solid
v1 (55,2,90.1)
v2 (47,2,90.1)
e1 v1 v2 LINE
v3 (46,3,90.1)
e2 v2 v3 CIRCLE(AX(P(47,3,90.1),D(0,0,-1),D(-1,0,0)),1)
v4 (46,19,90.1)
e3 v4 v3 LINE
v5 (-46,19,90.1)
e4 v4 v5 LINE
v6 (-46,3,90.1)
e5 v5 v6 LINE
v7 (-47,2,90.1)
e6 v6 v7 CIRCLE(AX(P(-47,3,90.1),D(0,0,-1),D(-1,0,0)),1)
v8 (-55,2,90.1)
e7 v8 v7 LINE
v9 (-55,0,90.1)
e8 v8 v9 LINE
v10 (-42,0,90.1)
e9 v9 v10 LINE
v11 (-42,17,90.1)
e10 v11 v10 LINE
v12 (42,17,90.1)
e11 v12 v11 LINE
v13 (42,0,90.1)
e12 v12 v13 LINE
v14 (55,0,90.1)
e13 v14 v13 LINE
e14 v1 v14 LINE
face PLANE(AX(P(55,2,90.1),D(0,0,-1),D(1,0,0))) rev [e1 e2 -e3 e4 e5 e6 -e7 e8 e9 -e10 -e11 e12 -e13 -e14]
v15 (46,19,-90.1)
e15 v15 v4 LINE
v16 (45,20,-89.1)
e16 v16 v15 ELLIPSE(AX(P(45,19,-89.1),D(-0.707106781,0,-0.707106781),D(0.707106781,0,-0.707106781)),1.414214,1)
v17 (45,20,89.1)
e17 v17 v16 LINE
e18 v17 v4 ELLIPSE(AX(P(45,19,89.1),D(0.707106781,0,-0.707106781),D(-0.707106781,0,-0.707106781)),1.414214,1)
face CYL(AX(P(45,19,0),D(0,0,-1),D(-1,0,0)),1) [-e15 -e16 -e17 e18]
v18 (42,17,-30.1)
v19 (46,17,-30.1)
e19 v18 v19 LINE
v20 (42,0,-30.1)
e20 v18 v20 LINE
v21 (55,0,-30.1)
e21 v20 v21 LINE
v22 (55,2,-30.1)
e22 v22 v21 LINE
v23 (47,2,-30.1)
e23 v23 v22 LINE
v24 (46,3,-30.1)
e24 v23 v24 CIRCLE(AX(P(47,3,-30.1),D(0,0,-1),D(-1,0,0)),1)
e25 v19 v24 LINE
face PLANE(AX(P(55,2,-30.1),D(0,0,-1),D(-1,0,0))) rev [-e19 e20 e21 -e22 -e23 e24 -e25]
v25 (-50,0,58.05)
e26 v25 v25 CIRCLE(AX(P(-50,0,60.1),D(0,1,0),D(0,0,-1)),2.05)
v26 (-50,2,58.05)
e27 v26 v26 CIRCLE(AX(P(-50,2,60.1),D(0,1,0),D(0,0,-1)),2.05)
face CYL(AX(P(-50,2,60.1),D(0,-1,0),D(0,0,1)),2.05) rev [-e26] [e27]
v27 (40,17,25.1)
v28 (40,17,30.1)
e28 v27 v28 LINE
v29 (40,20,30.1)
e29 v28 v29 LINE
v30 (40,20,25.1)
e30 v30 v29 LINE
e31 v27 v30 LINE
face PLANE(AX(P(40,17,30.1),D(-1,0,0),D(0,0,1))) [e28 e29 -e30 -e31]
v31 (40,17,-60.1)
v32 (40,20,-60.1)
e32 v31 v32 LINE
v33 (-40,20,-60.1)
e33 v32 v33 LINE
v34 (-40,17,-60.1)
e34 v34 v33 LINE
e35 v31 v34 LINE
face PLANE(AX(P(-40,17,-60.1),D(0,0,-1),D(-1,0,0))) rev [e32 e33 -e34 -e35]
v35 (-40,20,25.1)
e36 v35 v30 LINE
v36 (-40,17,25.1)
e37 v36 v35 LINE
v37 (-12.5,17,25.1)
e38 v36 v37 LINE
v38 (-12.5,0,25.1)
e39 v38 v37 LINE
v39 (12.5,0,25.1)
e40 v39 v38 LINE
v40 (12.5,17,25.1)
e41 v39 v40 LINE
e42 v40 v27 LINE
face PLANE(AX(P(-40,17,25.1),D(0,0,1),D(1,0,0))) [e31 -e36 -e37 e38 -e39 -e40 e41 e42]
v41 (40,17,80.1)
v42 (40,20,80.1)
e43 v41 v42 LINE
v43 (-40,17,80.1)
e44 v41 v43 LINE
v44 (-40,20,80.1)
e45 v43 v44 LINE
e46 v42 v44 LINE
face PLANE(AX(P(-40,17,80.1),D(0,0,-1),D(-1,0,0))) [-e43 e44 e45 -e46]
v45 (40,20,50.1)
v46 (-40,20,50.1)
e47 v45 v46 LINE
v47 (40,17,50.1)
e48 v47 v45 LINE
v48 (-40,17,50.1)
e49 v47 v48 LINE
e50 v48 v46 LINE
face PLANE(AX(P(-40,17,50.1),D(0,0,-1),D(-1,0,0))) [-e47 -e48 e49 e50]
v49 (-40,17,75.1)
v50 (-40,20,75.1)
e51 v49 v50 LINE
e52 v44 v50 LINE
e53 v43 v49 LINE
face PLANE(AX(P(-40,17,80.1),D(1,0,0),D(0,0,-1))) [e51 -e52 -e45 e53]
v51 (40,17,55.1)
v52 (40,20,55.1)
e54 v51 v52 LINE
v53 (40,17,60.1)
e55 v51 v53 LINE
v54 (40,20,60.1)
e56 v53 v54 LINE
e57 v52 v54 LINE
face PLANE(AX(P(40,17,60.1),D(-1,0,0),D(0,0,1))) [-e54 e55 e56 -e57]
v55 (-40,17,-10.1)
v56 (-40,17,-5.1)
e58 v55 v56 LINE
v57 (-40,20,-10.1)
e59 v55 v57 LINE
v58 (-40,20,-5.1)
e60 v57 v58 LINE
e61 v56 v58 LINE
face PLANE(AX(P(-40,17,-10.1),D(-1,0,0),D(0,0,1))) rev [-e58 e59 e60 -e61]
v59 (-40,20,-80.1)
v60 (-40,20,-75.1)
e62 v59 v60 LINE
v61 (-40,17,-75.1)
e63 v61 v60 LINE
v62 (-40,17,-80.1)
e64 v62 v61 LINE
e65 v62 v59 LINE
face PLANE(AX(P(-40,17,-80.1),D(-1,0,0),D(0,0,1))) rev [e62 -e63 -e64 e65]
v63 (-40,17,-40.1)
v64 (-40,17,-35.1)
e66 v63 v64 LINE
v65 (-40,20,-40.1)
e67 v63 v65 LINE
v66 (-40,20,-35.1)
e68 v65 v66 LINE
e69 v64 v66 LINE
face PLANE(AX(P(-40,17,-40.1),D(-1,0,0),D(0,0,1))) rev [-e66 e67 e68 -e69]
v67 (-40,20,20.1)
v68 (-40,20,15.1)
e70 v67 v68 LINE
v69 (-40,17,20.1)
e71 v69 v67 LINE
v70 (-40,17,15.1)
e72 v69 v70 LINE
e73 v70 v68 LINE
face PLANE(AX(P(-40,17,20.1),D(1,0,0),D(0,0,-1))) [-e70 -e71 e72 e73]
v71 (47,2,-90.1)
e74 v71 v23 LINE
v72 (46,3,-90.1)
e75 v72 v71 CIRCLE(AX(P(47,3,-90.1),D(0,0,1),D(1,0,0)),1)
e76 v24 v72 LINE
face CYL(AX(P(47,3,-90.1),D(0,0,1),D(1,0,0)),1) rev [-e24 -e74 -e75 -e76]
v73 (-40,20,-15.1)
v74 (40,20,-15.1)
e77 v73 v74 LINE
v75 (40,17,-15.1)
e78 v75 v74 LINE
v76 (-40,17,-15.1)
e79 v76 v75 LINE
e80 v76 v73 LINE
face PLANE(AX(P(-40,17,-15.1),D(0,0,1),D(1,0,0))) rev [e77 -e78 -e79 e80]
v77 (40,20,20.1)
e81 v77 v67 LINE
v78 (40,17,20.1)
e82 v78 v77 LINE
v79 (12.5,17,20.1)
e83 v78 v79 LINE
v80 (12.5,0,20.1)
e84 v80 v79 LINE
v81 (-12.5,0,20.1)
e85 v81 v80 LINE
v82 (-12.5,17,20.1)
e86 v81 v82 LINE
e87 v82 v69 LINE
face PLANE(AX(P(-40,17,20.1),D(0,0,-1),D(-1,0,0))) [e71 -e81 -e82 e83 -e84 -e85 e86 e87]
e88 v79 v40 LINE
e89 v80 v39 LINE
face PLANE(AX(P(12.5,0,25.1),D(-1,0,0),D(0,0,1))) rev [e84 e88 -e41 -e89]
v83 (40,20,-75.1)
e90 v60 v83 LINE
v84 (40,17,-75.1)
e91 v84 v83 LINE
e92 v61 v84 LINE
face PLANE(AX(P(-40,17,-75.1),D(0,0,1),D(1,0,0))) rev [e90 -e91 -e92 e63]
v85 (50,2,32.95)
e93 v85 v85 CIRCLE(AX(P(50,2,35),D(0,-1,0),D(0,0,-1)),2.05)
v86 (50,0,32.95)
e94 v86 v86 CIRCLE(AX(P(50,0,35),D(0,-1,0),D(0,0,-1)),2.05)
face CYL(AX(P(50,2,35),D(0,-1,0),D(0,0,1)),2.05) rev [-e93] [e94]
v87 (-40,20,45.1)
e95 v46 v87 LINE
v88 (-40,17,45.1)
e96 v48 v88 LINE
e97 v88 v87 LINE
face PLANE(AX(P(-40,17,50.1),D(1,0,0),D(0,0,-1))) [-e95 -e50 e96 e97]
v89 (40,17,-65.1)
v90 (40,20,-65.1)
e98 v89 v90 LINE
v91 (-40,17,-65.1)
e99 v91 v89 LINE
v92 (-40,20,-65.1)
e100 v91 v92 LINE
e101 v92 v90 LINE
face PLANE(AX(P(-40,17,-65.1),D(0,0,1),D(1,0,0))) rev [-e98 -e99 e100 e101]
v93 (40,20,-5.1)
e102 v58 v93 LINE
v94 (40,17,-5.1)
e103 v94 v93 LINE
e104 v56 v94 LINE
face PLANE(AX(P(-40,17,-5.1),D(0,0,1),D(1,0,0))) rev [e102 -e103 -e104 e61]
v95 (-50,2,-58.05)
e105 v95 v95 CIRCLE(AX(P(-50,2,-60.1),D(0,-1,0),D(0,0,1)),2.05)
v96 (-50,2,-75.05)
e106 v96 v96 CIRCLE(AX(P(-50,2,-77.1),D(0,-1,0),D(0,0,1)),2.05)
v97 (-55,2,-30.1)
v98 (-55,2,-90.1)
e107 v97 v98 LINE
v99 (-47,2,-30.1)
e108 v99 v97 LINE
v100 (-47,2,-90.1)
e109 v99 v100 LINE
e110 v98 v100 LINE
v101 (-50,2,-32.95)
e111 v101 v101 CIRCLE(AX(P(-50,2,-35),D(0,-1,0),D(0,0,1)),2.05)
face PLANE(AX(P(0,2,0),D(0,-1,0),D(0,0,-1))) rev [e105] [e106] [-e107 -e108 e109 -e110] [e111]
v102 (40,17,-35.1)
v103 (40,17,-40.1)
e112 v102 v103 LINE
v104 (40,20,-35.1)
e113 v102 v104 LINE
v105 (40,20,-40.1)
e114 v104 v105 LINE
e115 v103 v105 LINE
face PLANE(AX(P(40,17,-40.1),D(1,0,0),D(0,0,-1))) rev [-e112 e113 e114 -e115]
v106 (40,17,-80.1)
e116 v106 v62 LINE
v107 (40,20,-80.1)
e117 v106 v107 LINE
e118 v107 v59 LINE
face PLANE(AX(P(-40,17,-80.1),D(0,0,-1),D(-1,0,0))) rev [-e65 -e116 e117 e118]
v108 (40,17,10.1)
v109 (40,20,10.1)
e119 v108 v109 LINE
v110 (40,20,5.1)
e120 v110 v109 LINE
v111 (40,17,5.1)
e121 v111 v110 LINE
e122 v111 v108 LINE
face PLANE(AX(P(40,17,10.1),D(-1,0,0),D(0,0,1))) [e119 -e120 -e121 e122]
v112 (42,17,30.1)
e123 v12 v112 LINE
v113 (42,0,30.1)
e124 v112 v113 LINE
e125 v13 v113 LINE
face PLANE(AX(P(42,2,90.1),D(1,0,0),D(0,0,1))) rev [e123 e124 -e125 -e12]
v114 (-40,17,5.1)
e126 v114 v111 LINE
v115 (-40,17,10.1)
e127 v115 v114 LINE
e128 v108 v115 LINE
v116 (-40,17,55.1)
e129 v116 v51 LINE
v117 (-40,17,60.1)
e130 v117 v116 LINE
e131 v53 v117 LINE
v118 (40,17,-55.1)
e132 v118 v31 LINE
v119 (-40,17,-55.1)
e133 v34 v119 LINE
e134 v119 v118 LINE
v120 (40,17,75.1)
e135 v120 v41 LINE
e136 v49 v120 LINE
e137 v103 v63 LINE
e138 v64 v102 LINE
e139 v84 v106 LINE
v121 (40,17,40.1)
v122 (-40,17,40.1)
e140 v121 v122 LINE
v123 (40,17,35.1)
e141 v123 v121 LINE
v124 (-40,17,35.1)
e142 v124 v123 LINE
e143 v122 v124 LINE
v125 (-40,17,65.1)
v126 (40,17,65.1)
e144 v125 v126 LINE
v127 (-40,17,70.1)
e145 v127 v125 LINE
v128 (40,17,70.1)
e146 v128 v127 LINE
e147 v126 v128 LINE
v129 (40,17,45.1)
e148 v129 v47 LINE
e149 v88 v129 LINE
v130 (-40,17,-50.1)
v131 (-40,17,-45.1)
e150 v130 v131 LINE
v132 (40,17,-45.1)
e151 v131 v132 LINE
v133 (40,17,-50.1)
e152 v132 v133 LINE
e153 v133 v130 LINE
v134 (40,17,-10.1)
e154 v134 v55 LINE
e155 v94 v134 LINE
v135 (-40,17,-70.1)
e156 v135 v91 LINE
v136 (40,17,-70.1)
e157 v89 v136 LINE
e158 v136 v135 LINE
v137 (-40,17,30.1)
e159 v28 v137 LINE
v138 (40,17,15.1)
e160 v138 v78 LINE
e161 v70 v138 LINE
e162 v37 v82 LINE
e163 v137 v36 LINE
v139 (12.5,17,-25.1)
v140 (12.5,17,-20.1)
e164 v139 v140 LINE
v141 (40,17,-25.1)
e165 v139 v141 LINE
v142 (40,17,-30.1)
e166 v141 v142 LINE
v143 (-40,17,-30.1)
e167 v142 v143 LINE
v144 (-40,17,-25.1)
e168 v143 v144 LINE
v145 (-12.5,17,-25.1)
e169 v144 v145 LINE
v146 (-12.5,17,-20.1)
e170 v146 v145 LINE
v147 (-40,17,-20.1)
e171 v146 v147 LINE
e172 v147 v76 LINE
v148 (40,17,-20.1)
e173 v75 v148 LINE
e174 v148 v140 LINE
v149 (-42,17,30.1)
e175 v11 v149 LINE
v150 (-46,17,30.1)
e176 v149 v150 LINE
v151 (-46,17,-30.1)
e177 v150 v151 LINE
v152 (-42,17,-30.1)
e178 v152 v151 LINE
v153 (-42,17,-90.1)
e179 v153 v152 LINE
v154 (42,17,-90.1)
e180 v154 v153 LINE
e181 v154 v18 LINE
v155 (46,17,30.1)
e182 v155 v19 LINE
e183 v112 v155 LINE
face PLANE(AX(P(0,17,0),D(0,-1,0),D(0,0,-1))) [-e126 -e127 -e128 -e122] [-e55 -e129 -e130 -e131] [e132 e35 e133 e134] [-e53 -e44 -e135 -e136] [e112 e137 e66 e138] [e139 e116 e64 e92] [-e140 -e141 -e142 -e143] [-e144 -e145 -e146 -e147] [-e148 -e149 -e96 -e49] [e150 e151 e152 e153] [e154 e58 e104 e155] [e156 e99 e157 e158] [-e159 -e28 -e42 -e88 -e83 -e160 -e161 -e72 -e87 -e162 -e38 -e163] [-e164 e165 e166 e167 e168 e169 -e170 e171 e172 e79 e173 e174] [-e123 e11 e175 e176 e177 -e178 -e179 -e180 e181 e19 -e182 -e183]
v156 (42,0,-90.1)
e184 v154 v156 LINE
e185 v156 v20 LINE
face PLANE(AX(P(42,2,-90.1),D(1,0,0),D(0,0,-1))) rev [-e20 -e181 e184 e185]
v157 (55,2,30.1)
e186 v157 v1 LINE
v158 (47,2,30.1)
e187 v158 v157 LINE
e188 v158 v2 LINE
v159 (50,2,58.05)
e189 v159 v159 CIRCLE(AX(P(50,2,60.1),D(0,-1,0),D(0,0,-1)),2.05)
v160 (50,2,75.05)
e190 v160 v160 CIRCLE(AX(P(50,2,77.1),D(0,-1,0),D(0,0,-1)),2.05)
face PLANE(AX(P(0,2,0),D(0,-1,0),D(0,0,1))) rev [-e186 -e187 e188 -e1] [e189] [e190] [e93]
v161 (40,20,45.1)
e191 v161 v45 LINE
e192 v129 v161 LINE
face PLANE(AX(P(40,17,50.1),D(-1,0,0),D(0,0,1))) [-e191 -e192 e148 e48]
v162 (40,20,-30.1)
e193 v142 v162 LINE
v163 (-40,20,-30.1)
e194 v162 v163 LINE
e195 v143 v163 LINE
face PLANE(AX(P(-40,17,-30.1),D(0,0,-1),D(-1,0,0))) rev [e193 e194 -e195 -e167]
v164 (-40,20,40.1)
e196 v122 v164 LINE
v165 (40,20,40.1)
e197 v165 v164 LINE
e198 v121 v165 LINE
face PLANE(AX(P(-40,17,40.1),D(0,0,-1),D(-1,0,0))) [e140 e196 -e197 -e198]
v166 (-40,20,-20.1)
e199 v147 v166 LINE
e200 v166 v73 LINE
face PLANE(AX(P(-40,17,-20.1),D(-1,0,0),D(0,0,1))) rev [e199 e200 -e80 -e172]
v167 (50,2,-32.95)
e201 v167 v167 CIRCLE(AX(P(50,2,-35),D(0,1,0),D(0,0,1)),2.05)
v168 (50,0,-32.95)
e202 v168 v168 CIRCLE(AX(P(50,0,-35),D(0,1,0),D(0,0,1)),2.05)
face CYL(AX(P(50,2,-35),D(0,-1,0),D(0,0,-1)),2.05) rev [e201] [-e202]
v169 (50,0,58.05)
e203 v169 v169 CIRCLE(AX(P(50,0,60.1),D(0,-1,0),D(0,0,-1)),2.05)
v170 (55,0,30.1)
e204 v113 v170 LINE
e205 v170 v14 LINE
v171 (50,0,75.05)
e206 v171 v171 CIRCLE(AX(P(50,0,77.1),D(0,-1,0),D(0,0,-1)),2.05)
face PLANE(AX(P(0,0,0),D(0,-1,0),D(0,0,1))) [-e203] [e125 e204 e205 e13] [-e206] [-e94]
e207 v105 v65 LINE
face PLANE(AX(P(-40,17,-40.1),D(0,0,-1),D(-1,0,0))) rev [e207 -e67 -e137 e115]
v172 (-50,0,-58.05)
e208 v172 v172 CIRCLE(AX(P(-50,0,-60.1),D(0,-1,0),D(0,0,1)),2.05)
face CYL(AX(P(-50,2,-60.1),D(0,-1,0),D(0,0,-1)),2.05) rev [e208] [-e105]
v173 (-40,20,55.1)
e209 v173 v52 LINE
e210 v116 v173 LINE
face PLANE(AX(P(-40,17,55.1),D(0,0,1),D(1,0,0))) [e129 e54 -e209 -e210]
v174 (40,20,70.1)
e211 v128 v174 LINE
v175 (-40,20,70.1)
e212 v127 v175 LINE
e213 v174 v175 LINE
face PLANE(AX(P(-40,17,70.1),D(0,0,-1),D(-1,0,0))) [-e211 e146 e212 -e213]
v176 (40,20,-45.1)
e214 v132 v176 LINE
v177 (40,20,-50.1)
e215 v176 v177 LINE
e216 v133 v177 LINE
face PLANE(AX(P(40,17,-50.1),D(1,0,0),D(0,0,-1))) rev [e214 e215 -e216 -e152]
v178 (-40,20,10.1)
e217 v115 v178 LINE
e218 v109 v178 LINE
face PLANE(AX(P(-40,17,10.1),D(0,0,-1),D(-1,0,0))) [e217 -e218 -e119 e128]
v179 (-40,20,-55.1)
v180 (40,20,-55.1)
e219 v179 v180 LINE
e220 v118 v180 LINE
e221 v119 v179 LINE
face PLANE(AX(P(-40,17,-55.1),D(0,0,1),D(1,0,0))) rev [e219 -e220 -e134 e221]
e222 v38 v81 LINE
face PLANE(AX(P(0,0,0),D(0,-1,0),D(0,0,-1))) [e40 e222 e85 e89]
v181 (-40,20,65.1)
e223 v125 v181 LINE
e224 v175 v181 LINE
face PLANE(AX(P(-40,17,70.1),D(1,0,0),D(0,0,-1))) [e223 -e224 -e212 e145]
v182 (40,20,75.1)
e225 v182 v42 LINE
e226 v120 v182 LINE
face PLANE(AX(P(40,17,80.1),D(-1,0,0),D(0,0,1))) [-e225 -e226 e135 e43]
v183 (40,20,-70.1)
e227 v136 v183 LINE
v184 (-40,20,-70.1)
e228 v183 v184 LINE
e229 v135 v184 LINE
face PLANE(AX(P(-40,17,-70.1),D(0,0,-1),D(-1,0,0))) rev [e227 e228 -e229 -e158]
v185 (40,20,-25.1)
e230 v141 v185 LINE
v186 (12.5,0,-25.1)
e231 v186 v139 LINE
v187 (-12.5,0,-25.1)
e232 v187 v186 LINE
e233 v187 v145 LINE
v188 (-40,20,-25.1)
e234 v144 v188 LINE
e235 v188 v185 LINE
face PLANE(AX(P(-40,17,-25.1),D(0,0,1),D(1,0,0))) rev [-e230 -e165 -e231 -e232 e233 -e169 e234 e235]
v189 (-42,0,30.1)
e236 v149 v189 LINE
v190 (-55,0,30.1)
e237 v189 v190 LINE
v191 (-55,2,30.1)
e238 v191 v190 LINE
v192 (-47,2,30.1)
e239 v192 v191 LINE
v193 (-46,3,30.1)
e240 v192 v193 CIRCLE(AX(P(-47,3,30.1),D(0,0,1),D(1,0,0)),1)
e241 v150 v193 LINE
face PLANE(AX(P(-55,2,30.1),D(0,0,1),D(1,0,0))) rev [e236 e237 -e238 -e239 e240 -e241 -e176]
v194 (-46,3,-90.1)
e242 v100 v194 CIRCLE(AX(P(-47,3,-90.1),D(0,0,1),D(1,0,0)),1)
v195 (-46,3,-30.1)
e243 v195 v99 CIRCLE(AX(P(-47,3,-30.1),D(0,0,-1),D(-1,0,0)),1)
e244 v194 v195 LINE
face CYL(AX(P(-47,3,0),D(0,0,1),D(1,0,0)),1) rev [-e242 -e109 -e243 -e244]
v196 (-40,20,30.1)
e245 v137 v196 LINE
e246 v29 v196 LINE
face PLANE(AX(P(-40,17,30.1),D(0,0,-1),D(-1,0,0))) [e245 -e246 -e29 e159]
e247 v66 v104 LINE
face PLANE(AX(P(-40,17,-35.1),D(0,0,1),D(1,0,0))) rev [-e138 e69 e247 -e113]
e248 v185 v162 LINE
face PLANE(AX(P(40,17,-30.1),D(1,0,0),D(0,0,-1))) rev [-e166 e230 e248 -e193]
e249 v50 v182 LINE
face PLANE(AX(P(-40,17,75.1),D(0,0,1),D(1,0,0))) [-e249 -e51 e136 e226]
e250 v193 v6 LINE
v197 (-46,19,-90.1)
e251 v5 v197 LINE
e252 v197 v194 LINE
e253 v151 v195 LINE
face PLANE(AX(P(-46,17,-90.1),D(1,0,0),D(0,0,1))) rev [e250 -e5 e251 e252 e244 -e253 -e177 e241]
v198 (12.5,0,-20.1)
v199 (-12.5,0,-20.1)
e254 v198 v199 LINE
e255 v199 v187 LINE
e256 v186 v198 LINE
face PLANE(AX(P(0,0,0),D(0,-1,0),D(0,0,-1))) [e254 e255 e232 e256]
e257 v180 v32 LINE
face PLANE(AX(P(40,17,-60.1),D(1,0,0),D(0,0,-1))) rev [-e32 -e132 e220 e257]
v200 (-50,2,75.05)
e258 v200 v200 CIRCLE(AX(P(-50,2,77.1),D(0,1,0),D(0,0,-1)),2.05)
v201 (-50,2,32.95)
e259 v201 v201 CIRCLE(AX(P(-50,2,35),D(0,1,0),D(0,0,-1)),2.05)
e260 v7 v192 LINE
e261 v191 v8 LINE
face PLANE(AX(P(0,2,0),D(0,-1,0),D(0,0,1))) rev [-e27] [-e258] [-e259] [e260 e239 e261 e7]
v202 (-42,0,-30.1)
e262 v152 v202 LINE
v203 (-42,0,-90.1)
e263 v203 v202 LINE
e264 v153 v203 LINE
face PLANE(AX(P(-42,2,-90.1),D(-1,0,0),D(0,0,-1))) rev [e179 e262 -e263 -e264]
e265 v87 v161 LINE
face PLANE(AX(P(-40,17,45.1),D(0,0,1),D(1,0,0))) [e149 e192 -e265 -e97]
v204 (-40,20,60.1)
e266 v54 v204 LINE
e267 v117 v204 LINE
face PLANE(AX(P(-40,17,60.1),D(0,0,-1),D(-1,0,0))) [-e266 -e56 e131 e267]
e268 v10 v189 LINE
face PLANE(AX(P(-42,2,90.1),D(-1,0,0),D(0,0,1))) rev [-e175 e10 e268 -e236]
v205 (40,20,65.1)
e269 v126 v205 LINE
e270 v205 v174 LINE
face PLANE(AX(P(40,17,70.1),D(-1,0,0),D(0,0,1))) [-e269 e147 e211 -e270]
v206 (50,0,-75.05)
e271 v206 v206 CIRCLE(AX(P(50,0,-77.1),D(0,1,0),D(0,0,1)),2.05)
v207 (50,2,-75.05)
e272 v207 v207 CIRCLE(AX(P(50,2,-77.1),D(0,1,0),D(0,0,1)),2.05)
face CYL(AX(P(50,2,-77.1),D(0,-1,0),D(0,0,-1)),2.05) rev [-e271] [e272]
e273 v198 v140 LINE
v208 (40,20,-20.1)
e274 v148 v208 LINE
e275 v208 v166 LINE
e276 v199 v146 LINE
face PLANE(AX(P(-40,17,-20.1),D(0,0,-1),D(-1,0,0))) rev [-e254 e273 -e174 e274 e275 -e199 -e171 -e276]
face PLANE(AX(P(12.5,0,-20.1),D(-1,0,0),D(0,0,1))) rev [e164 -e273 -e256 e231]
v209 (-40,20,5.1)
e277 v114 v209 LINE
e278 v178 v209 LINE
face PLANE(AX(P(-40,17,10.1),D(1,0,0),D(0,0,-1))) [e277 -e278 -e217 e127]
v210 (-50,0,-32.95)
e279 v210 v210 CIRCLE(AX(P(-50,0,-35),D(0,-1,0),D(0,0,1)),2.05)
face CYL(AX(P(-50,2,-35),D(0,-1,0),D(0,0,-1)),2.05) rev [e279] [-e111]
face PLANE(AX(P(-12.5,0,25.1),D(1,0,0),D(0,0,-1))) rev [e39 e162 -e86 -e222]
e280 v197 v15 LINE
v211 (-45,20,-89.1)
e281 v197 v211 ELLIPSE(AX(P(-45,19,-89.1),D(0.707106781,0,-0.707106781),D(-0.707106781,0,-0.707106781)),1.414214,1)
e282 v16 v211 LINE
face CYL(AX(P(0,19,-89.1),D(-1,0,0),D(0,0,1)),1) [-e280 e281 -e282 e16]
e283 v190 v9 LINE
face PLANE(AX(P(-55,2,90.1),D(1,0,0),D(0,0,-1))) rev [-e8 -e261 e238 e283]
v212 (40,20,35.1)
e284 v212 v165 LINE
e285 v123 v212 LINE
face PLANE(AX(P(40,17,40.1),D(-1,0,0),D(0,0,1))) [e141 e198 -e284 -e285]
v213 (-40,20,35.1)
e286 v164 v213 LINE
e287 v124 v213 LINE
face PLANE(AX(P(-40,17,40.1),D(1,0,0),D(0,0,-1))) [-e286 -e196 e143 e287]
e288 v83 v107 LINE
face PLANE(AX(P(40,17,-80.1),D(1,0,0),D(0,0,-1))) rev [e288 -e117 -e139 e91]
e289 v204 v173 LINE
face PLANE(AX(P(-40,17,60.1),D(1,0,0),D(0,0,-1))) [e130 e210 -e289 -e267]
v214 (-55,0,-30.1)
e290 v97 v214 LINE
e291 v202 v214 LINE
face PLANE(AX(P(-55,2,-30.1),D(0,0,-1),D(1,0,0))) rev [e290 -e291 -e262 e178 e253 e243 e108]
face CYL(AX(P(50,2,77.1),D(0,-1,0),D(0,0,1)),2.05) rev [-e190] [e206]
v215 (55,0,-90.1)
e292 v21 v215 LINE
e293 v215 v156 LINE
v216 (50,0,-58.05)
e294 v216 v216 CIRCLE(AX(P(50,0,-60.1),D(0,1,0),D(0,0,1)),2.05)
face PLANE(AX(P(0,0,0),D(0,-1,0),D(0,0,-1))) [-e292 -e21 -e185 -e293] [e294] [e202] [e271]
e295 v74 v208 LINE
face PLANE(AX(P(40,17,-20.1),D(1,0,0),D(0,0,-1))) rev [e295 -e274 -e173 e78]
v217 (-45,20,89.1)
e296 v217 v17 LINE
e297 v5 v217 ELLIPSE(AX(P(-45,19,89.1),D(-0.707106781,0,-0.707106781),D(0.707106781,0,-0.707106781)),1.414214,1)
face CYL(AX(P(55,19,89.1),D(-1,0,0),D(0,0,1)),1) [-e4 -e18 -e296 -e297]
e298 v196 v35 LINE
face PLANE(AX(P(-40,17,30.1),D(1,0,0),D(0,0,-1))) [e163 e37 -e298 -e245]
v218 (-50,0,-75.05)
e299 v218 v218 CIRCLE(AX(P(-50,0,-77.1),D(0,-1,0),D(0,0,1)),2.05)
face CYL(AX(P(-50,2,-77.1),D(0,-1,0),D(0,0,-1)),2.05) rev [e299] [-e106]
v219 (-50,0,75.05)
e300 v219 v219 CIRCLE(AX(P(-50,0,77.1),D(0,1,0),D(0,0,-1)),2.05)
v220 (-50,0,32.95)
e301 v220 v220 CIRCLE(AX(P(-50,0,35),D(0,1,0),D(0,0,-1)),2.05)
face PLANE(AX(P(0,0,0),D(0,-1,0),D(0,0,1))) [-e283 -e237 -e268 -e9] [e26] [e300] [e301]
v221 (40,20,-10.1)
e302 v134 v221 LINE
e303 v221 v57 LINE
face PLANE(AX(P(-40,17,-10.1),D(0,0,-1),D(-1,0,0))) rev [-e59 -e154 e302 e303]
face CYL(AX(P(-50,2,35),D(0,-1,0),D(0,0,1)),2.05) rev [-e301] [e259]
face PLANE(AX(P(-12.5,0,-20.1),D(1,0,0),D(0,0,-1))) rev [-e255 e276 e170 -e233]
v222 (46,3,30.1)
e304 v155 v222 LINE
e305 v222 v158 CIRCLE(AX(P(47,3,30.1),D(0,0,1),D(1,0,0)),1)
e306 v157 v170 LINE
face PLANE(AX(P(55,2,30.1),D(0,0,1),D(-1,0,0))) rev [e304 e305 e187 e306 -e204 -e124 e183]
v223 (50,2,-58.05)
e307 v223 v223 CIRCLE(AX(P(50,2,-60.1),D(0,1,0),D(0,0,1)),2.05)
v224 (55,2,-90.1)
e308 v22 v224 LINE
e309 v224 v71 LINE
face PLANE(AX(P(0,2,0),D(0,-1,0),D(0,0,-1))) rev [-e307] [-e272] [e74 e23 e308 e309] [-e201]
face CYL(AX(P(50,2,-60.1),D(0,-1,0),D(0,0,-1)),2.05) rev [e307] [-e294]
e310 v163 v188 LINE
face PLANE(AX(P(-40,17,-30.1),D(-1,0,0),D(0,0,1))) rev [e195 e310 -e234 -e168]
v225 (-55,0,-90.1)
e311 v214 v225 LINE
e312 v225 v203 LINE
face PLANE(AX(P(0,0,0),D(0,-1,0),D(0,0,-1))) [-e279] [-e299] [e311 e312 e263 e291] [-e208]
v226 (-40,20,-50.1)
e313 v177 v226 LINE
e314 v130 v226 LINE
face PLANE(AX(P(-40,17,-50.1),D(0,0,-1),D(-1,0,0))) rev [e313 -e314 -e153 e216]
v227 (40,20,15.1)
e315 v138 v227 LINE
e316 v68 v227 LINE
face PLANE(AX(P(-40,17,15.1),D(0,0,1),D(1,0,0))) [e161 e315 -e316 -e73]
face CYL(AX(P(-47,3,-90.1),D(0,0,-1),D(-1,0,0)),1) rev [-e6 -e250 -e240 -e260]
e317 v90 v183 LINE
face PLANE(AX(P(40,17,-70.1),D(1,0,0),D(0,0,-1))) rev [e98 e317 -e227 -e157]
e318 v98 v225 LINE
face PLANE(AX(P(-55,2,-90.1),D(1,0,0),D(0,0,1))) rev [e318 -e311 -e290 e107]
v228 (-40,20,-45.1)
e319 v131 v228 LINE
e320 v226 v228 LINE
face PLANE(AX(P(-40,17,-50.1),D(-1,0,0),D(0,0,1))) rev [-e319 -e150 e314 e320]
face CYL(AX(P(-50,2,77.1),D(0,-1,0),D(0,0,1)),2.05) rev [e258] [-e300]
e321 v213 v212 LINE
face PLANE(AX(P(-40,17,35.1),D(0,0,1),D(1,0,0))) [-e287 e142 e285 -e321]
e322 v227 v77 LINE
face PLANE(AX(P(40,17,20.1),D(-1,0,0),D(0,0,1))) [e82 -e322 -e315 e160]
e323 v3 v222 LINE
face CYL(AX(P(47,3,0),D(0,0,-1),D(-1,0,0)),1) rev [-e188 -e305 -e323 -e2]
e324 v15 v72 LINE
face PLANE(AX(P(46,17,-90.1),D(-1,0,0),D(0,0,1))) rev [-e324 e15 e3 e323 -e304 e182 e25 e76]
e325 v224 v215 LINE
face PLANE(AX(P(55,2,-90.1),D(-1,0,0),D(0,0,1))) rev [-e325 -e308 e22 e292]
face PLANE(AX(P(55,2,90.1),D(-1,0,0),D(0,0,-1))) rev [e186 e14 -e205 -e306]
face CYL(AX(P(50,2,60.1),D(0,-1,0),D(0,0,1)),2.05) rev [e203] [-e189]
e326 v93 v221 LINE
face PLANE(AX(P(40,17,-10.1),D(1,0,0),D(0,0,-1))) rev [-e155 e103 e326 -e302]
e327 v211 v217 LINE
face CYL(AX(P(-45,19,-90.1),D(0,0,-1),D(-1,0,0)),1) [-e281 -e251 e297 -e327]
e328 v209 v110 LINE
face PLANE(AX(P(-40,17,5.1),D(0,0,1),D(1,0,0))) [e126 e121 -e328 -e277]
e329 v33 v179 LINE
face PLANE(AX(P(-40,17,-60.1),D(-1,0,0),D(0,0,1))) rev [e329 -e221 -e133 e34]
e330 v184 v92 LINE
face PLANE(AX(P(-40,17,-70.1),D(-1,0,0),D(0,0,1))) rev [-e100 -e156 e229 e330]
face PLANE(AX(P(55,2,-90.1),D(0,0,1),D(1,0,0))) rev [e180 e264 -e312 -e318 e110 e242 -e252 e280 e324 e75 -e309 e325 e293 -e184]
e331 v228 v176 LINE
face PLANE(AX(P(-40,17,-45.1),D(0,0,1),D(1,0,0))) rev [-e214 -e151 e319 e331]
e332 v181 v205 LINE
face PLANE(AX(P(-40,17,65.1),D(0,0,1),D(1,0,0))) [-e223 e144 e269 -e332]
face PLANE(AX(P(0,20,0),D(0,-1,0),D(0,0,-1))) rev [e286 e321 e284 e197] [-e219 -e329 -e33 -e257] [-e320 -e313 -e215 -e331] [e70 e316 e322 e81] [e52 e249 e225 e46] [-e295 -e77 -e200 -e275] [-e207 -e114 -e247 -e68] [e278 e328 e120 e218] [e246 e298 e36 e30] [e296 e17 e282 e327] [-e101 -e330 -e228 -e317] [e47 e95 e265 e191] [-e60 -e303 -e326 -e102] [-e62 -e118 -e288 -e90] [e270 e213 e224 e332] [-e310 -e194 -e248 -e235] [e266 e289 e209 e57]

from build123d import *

# Parameters (mm, degrees)
SKETCH1_W               = 13
SKETCH1_H               = 60
SKETCH1_R               = 2.05
BOSS_EXTRUDE1_DEPTH     = 2
SKETCH2_W               = 4
SKETCH2_H               = 60
BOSS_EXTRUDE2_DEPTH     = 15
SKETCH3_W               = 46
SKETCH3_H               = 90.1
BOSS_EXTRUDE3_DEPTH     = 3
MIRROR1_START           = 17
MIRROR1_DEPTH           = 3
MIRROR1_2_OUTLINE_W     = 4
MIRROR1_2_OUTLINE_H     = 60
MIRROR1_2_DEPTH         = 17
MIRROR1_3_OUTLINE_W     = 9
MIRROR1_3_OUTLINE_H     = 60
MIRROR1_3_OUTLINE_R     = 2.05
MIRROR1_3_DEPTH         = 2
SKETCH4_W               = 80
SKETCH4_H               = 5
CUT_EXTRUDE1_DEPTH      = 3
LPATTERN1_COUNT         = 8
LPATTERN1_PITCH         = 10
MIRROR2_COPY_1_SKETCH_W = 80
MIRROR2_COPY_1_SKETCH_H = 5
MIRROR2_COPY_1_DEPTH    = 3
MIRROR2_COPY_2_SKETCH_W = 80
MIRROR2_COPY_2_SKETCH_H = 5
MIRROR2_COPY_2_DEPTH    = 3
MIRROR2_COPY_3_SKETCH_W = 80
MIRROR2_COPY_3_SKETCH_H = 5
MIRROR2_COPY_3_DEPTH    = 3
MIRROR2_COPY_4_SKETCH_W = 80
MIRROR2_COPY_4_SKETCH_H = 5
MIRROR2_COPY_4_DEPTH    = 3
MIRROR2_COPY_5_SKETCH_W = 80
MIRROR2_COPY_5_SKETCH_H = 5
MIRROR2_COPY_5_DEPTH    = 3
MIRROR2_COPY_6_SKETCH_W = 80
MIRROR2_COPY_6_SKETCH_H = 5
MIRROR2_COPY_6_DEPTH    = 3
MIRROR2_COPY_7_SKETCH_W = 80
MIRROR2_COPY_7_SKETCH_H = 5
MIRROR2_COPY_7_DEPTH    = 3
FILLET1_R               = 1
SKETCH5_W               = 25
SKETCH5_H               = 5
BOSS_EXTRUDE4_DEPTH     = 17


# Read off the part's stored shape, not the designer's step: Mirror1
with BuildPart() as part:
    # Sketch1 → Boss-Extrude1 (new body)
    with BuildSketch(Plane(origin=(0, 0, 0), x_dir=(1, 0, 0), z_dir=(0, 1, 0))):
        with Locations((48.5, 60.1)):
            Rectangle(SKETCH1_W, SKETCH1_H)
        with Locations(Location((50, 77.1, 0), (0, 0, 270))):
            Circle(SKETCH1_R, mode=Mode.SUBTRACT)
        with Locations(Location((50, 60.1, 0), (0, 0, 270))):
            Circle(SKETCH1_R, mode=Mode.SUBTRACT)
        with Locations(Location((50, 35, 0), (0, 0, 270))):
            Circle(SKETCH1_R, mode=Mode.SUBTRACT)
    extrude(amount=BOSS_EXTRUDE1_DEPTH)

    # Sketch2 → Boss-Extrude2 (add)
    with BuildSketch(Plane(origin=(0, 2, 0), x_dir=(1, 0, 0), z_dir=(0, 1, 0))):
        with Locations((44, 60.1)):
            Rectangle(SKETCH2_W, SKETCH2_H)
    extrude(amount=BOSS_EXTRUDE2_DEPTH)

    # Sketch3 → Boss-Extrude3 (add)
    with BuildSketch(Plane(origin=(0, 17, 0), x_dir=(1, 0, 0), z_dir=(0, 1, 0))):
        with Locations((23, 45.05)):
            Rectangle(SKETCH3_W, SKETCH3_H)
    extrude(amount=BOSS_EXTRUDE3_DEPTH)

    # Mirror1 outline → Mirror1 (add)
    with BuildSketch(Plane(origin=(0, 0, 0), x_dir=(1, 0, 0), z_dir=(0, 1, 0)).offset(MIRROR1_START)):
        Polygon((46, -90.1), (46, 0), (0, 0), (0, 90.1), (-46, 90.1), (-46, -90.1), align=None)
    extrude(amount=MIRROR1_DEPTH)

    # Mirror1 2 outline → Mirror1 2 (add)
    with BuildSketch(Plane(origin=(0, 0, 0), x_dir=(1, 0, 0), z_dir=(0, 1, 0))):
        with Locations((44, -60.1)):
            Rectangle(MIRROR1_2_OUTLINE_W, MIRROR1_2_OUTLINE_H)
        with Locations((-44, -60.1)):
            Rectangle(MIRROR1_2_OUTLINE_W, MIRROR1_2_OUTLINE_H)
        with Locations((-44, 60.1)):
            Rectangle(MIRROR1_2_OUTLINE_W, MIRROR1_2_OUTLINE_H)
    extrude(amount=MIRROR1_2_DEPTH)

    # Mirror1 3 outline → Mirror1 3 (add)
    # profile 1 of 3: a face of its own
    with BuildSketch(Plane(origin=(0, 0, 0), x_dir=(1, 0, 0), z_dir=(0, 1, 0))):
        with Locations((50.5, -60.1)):
            Rectangle(MIRROR1_3_OUTLINE_W, MIRROR1_3_OUTLINE_H)
        with Locations((50, -77.1)):
            Circle(MIRROR1_3_OUTLINE_R, mode=Mode.SUBTRACT)
        with Locations((50, -60.1)):
            Circle(MIRROR1_3_OUTLINE_R, mode=Mode.SUBTRACT)
        with Locations((50, -35)):
            Circle(MIRROR1_3_OUTLINE_R, mode=Mode.SUBTRACT)
    # profile 2 of 3: a face of its own
    with BuildSketch(Plane(origin=(0, 0, 0), x_dir=(1, 0, 0), z_dir=(0, 1, 0))):
        with Locations((-50.5, -60.1)):
            Rectangle(MIRROR1_3_OUTLINE_W, MIRROR1_3_OUTLINE_H)
        with Locations((-50, -77.1)):
            Circle(MIRROR1_3_OUTLINE_R, mode=Mode.SUBTRACT)
        with Locations((-50, -60.1)):
            Circle(MIRROR1_3_OUTLINE_R, mode=Mode.SUBTRACT)
        with Locations((-50, -35)):
            Circle(MIRROR1_3_OUTLINE_R, mode=Mode.SUBTRACT)
    # profile 3 of 3: a face of its own
    with BuildSketch(Plane(origin=(0, 0, 0), x_dir=(1, 0, 0), z_dir=(0, 1, 0))):
        with Locations((-50.5, 60.1)):
            Rectangle(MIRROR1_3_OUTLINE_W, MIRROR1_3_OUTLINE_H)
        with Locations((-50, 35)):
            Circle(MIRROR1_3_OUTLINE_R, mode=Mode.SUBTRACT)
        with Locations((-50, 60.1)):
            Circle(MIRROR1_3_OUTLINE_R, mode=Mode.SUBTRACT)
        with Locations((-50, 77.1)):
            Circle(MIRROR1_3_OUTLINE_R, mode=Mode.SUBTRACT)
    extrude(amount=MIRROR1_3_DEPTH)

    # Sketch4 → Cut-Extrude1 (cut)
    with BuildSketch(Plane(origin=(0, 20, 0), x_dir=(1, 0, 0), z_dir=(0, 1, 0))):
        with Locations((0, 77.6)):
            Rectangle(SKETCH4_W, SKETCH4_H)
    cut_extrude1 = extrude(amount=-CUT_EXTRUDE1_DEPTH, mode=Mode.SUBTRACT)

    # LPattern1: Cut-Extrude1 ×8
    with Locations(*[(0, 0, i * LPATTERN1_PITCH) for i in range(1, LPATTERN1_COUNT)]):
        add(cut_extrude1, mode=Mode.SUBTRACT)

    # Mirror2: Cut-Extrude1 across Front Plane
    add(cut_extrude1.mirror(Plane.XY), mode=Mode.SUBTRACT)

    # Mirror2 copy 1 sketch → Mirror2 copy 1 (cut)
    with BuildSketch(Plane(origin=(0, 20, -10), x_dir=(1, 0, 0), z_dir=(0, 1, 0))):
        with Locations((0, -77.6)):
            Rectangle(MIRROR2_COPY_1_SKETCH_W, MIRROR2_COPY_1_SKETCH_H)
    extrude(amount=-MIRROR2_COPY_1_DEPTH, mode=Mode.SUBTRACT)

    # Mirror2 copy 2 sketch → Mirror2 copy 2 (cut)
    with BuildSketch(Plane(origin=(0, 20, -20), x_dir=(1, 0, 0), z_dir=(0, 1, 0))):
        with Locations((0, -77.6)):
            Rectangle(MIRROR2_COPY_2_SKETCH_W, MIRROR2_COPY_2_SKETCH_H)
    extrude(amount=-MIRROR2_COPY_2_DEPTH, mode=Mode.SUBTRACT)

    # Mirror2 copy 3 sketch → Mirror2 copy 3 (cut)
    with BuildSketch(Plane(origin=(0, 20, -30), x_dir=(1, 0, 0), z_dir=(0, 1, 0))):
        with Locations((0, -77.6)):
            Rectangle(MIRROR2_COPY_3_SKETCH_W, MIRROR2_COPY_3_SKETCH_H)
    extrude(amount=-MIRROR2_COPY_3_DEPTH, mode=Mode.SUBTRACT)

    # Mirror2 copy 4 sketch → Mirror2 copy 4 (cut)
    with BuildSketch(Plane(origin=(0, 20, -40), x_dir=(1, 0, 0), z_dir=(0, 1, 0))):
        with Locations((0, -77.6)):
            Rectangle(MIRROR2_COPY_4_SKETCH_W, MIRROR2_COPY_4_SKETCH_H)
    extrude(amount=-MIRROR2_COPY_4_DEPTH, mode=Mode.SUBTRACT)

    # Mirror2 copy 5 sketch → Mirror2 copy 5 (cut)
    with BuildSketch(Plane(origin=(0, 20, -50), x_dir=(1, 0, 0), z_dir=(0, 1, 0))):
        with Locations((0, -77.6)):
            Rectangle(MIRROR2_COPY_5_SKETCH_W, MIRROR2_COPY_5_SKETCH_H)
    extrude(amount=-MIRROR2_COPY_5_DEPTH, mode=Mode.SUBTRACT)

    # Mirror2 copy 6 sketch → Mirror2 copy 6 (cut)
    with BuildSketch(Plane(origin=(0, 20, -60), x_dir=(1, 0, 0), z_dir=(0, 1, 0))):
        with Locations((0, -77.6)):
            Rectangle(MIRROR2_COPY_6_SKETCH_W, MIRROR2_COPY_6_SKETCH_H)
    extrude(amount=-MIRROR2_COPY_6_DEPTH, mode=Mode.SUBTRACT)

    # Mirror2 copy 7 sketch → Mirror2 copy 7 (cut)
    with BuildSketch(Plane(origin=(0, 20, -70), x_dir=(1, 0, 0), z_dir=(0, 1, 0))):
        with Locations((0, -77.6)):
            Rectangle(MIRROR2_COPY_7_SKETCH_W, MIRROR2_COPY_7_SKETCH_H)
    extrude(amount=-MIRROR2_COPY_7_DEPTH, mode=Mode.SUBTRACT)

    # Fillet1
    fillet1_edges = [part.edges().sort_by_distance(p)[0] for p in [
        (46, 2, -60.1),
        (46, 20, 0),
        (0, 20, -90.1),
        (-46, 2, -60.1),
        (-46, 2, 60.1),
        (-46, 20, 0),
        (46, 2, 60.1),
        (0, 20, 90.1),
    ]]
    fillet(fillet1_edges, radius=FILLET1_R)

    # Sketch5 → Boss-Extrude4 (add)
    with BuildSketch(Plane.XZ.offset(-17)):
        with Locations((0, 22.6)):
            Rectangle(SKETCH5_W, SKETCH5_H)
        with Locations((0, -22.6)):
            Rectangle(SKETCH5_W, SKETCH5_H)
    extrude(amount=BOSS_EXTRUDE4_DEPTH)


solid = part.part
